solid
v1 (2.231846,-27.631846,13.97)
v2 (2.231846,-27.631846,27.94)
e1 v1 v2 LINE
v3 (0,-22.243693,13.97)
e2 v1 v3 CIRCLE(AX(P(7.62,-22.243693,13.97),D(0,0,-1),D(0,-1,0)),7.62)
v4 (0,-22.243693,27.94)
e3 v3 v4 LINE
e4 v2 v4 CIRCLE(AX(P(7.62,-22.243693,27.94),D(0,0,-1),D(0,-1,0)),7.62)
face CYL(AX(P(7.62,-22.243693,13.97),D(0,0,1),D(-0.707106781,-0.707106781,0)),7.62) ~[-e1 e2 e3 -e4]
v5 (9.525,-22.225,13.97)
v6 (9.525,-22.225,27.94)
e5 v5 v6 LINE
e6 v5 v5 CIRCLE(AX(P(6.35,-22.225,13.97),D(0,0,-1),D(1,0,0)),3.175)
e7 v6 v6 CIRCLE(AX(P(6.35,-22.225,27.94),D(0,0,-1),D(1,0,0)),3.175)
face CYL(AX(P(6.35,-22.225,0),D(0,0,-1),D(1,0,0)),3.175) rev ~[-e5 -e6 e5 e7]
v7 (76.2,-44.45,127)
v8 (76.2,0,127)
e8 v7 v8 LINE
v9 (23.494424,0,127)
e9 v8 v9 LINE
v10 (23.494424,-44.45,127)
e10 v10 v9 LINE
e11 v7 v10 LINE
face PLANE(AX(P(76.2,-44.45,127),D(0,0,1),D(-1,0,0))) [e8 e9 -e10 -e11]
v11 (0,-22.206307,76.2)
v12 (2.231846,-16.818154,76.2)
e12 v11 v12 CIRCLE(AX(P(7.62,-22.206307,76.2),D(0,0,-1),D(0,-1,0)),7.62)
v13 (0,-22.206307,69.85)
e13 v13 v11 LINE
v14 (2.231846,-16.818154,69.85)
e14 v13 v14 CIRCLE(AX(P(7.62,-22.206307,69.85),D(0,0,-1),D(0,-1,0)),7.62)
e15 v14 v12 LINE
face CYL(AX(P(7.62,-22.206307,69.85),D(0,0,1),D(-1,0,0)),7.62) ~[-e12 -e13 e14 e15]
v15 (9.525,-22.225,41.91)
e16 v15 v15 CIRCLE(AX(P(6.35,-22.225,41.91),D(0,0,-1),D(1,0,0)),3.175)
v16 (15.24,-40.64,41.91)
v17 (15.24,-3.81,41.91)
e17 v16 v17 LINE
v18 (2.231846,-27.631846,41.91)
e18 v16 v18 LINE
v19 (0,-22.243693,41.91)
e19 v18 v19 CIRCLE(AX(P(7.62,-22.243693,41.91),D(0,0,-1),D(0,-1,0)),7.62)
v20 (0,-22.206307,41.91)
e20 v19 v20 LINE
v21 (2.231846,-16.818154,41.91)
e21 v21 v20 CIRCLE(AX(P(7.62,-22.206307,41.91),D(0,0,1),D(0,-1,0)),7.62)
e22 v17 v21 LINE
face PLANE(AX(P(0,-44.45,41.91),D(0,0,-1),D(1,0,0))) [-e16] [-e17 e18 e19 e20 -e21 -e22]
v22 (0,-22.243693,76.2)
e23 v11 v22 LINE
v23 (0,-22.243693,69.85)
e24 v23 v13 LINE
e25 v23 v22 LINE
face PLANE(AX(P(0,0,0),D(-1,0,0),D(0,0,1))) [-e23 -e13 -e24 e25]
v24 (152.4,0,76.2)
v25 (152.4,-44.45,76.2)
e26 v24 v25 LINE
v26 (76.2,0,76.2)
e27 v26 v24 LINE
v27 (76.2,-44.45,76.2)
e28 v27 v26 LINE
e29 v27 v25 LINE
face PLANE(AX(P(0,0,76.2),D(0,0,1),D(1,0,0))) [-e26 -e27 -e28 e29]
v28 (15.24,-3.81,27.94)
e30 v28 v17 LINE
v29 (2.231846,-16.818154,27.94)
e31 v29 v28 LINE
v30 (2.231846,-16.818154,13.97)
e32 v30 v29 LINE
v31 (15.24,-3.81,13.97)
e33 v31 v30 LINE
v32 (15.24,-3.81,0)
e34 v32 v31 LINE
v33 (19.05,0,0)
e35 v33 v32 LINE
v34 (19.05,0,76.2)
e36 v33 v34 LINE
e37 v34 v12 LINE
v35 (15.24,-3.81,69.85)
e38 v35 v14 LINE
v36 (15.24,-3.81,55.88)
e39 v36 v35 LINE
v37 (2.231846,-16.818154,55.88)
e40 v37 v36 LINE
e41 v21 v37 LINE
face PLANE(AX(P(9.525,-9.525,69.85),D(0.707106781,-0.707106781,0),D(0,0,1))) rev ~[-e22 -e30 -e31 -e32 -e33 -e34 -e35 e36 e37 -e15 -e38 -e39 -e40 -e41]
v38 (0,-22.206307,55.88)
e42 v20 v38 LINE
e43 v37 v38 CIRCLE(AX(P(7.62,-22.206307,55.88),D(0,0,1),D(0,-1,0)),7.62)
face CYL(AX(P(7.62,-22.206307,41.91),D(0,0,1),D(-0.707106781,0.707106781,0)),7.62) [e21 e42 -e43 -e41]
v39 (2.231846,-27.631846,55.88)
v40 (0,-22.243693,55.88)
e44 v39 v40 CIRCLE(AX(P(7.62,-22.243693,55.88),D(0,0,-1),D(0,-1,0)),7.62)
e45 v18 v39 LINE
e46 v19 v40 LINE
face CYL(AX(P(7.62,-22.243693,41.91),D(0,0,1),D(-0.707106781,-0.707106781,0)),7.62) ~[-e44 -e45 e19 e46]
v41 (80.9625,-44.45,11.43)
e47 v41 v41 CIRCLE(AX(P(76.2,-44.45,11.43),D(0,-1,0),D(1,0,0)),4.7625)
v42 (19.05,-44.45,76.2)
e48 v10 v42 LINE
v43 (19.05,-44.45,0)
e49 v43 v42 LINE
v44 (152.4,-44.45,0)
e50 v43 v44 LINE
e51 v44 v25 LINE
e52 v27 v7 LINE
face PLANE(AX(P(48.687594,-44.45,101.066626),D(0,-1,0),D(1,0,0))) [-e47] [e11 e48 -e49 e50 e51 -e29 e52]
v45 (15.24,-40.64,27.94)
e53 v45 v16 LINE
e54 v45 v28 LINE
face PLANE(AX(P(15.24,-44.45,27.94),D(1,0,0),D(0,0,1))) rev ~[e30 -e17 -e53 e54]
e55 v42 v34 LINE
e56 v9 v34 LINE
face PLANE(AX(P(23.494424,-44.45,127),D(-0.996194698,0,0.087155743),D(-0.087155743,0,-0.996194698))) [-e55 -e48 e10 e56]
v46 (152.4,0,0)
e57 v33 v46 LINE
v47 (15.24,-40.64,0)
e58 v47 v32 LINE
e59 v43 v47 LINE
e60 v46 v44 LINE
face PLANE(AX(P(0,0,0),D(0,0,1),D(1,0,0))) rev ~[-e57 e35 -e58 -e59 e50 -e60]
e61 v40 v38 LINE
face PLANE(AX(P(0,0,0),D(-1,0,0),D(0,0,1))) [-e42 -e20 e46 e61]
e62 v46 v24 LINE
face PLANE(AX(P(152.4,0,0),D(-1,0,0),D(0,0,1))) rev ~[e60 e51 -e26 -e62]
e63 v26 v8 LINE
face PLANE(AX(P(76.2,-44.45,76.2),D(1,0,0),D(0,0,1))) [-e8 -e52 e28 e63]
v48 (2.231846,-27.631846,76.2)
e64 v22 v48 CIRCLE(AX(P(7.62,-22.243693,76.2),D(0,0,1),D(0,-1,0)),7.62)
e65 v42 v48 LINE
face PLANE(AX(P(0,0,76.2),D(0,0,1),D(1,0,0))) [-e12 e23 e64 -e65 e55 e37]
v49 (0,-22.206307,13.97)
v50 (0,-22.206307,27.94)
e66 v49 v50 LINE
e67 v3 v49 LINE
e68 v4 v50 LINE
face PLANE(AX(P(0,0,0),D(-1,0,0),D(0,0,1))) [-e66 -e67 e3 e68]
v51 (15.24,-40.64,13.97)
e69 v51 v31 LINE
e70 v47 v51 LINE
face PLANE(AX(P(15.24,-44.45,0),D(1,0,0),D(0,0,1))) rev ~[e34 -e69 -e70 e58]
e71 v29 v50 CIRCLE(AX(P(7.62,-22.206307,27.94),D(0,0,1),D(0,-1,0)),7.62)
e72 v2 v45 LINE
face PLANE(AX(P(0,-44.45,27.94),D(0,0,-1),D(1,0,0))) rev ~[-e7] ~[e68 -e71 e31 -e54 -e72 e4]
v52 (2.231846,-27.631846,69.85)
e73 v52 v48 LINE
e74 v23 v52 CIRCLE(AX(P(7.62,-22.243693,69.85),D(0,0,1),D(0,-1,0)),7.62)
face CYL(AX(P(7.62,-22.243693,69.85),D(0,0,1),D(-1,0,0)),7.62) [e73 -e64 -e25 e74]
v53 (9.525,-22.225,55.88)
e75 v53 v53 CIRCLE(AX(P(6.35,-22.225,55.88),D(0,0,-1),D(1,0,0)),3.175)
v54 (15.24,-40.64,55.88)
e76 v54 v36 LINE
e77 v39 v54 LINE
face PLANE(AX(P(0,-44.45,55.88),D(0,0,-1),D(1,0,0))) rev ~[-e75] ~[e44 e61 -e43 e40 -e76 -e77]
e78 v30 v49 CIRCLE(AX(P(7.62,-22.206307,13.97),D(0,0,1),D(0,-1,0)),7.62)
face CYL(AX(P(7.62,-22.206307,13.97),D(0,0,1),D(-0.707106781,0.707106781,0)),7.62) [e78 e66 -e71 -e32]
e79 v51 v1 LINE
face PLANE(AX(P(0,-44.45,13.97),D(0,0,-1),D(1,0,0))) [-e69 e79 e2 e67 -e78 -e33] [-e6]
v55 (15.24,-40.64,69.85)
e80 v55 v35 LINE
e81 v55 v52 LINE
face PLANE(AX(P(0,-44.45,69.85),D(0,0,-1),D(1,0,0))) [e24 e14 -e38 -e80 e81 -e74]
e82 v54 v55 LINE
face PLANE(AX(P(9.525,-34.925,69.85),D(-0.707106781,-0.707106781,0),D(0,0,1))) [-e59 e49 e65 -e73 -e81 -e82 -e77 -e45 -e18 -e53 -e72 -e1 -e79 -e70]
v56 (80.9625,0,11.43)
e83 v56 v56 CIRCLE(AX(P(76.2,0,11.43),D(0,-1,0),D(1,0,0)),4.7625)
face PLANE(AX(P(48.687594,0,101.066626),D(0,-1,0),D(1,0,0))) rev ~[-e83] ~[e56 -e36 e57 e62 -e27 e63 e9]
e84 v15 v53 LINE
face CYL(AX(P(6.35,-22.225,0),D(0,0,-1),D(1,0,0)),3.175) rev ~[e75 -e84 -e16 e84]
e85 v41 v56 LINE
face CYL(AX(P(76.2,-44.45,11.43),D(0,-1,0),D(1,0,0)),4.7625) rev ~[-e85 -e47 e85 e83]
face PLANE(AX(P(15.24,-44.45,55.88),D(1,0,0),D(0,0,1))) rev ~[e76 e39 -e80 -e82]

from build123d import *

# Parameters (mm, degrees)
F0_W       = 152.4
F0_H       = 76.2
F1_DEPTH   = 44.45
F2_W       = 15.24
F2_H       = 13.97
F3_DEPTH   = 44.451
F4_R       = 3.175
F5_DEPTH   = 69.85
F6_C1_SIZE = 19.05
F6_C2_SIZE = 19.05
F7_R       = 4.7625
F8_DEPTH   = 44.451
F10_DEPTH  = 44.45
F11_R      = 7.62


with BuildPart() as f1:
    # F0 (on Front) → F1 (new body)
    with BuildSketch(Plane.XZ):
        with Locations((76.2, 38.1)):
            Rectangle(F0_W, F0_H)
    extrude(amount=F1_DEPTH)

    # F2 (on face) → F3 (cut, through all)
    with BuildSketch(Plane.XZ.offset(44.45)):
        with Locations((7.62, 6.985)):
            Rectangle(F2_W, F2_H)
        with Locations((7.62, 34.925)):
            Rectangle(F2_W, F2_H)
        with Locations((7.62, 62.865)):
            Rectangle(F2_W, F2_H)
    extrude(amount=-F3_DEPTH, mode=Mode.SUBTRACT)

    # F4 (on face) → F5 (cut)
    with BuildSketch(Plane(origin=(0, 0, 0), x_dir=(1, 0, 0), z_dir=(0, 0, -1))):
        with Locations((6.35, 22.225)):
            Circle(F4_R)
    extrude(amount=-F5_DEPTH, mode=Mode.SUBTRACT)

    # F6: chamfer of 19.05 on 6 edges, made by hand

    # F6_c1
    f6_c1_edges = [f1.edges().sort_by_distance(p)[0] for p in [
        (0, 0, 73.025),
    ]]
    chamfer(f6_c1_edges, length=F6_C1_SIZE)

    # F6_c2
    f6_c2_edges = [f1.edges().sort_by_distance(p)[0] for p in [
        (0, -44.45, 73.025),
    ]]
    chamfer(f6_c2_edges, length=F6_C2_SIZE)

    # F7 (on face) → F8 (cut, through all)
    with BuildSketch(Plane.XZ.offset(44.45)):
        with Locations((76.2, 11.43)):
            Circle(F7_R)
    extrude(amount=-F8_DEPTH, mode=Mode.SUBTRACT)

    # F9 (on face) → F10 (join)
    with BuildSketch(Plane.XZ.offset(44.45)):
        Polygon((23.4944241071, 127), (19.05, 76.2), (76.2, 76.2), (76.2, 127), align=None)
    extrude(amount=-F10_DEPTH)

    # F11
    f11_edges = [f1.edges().sort_by_distance(p)[0] for p in [
        (0, -19.05, 73.025),
        (0, -25.4, 73.025),
        (0, -25.4, 48.895),
        (0, -19.05, 48.895),
        (0, -19.05, 20.955),
        (0, -25.4, 20.955),
    ]]
    fillet(f11_edges, radius=F11_R)


solid = f1.part
